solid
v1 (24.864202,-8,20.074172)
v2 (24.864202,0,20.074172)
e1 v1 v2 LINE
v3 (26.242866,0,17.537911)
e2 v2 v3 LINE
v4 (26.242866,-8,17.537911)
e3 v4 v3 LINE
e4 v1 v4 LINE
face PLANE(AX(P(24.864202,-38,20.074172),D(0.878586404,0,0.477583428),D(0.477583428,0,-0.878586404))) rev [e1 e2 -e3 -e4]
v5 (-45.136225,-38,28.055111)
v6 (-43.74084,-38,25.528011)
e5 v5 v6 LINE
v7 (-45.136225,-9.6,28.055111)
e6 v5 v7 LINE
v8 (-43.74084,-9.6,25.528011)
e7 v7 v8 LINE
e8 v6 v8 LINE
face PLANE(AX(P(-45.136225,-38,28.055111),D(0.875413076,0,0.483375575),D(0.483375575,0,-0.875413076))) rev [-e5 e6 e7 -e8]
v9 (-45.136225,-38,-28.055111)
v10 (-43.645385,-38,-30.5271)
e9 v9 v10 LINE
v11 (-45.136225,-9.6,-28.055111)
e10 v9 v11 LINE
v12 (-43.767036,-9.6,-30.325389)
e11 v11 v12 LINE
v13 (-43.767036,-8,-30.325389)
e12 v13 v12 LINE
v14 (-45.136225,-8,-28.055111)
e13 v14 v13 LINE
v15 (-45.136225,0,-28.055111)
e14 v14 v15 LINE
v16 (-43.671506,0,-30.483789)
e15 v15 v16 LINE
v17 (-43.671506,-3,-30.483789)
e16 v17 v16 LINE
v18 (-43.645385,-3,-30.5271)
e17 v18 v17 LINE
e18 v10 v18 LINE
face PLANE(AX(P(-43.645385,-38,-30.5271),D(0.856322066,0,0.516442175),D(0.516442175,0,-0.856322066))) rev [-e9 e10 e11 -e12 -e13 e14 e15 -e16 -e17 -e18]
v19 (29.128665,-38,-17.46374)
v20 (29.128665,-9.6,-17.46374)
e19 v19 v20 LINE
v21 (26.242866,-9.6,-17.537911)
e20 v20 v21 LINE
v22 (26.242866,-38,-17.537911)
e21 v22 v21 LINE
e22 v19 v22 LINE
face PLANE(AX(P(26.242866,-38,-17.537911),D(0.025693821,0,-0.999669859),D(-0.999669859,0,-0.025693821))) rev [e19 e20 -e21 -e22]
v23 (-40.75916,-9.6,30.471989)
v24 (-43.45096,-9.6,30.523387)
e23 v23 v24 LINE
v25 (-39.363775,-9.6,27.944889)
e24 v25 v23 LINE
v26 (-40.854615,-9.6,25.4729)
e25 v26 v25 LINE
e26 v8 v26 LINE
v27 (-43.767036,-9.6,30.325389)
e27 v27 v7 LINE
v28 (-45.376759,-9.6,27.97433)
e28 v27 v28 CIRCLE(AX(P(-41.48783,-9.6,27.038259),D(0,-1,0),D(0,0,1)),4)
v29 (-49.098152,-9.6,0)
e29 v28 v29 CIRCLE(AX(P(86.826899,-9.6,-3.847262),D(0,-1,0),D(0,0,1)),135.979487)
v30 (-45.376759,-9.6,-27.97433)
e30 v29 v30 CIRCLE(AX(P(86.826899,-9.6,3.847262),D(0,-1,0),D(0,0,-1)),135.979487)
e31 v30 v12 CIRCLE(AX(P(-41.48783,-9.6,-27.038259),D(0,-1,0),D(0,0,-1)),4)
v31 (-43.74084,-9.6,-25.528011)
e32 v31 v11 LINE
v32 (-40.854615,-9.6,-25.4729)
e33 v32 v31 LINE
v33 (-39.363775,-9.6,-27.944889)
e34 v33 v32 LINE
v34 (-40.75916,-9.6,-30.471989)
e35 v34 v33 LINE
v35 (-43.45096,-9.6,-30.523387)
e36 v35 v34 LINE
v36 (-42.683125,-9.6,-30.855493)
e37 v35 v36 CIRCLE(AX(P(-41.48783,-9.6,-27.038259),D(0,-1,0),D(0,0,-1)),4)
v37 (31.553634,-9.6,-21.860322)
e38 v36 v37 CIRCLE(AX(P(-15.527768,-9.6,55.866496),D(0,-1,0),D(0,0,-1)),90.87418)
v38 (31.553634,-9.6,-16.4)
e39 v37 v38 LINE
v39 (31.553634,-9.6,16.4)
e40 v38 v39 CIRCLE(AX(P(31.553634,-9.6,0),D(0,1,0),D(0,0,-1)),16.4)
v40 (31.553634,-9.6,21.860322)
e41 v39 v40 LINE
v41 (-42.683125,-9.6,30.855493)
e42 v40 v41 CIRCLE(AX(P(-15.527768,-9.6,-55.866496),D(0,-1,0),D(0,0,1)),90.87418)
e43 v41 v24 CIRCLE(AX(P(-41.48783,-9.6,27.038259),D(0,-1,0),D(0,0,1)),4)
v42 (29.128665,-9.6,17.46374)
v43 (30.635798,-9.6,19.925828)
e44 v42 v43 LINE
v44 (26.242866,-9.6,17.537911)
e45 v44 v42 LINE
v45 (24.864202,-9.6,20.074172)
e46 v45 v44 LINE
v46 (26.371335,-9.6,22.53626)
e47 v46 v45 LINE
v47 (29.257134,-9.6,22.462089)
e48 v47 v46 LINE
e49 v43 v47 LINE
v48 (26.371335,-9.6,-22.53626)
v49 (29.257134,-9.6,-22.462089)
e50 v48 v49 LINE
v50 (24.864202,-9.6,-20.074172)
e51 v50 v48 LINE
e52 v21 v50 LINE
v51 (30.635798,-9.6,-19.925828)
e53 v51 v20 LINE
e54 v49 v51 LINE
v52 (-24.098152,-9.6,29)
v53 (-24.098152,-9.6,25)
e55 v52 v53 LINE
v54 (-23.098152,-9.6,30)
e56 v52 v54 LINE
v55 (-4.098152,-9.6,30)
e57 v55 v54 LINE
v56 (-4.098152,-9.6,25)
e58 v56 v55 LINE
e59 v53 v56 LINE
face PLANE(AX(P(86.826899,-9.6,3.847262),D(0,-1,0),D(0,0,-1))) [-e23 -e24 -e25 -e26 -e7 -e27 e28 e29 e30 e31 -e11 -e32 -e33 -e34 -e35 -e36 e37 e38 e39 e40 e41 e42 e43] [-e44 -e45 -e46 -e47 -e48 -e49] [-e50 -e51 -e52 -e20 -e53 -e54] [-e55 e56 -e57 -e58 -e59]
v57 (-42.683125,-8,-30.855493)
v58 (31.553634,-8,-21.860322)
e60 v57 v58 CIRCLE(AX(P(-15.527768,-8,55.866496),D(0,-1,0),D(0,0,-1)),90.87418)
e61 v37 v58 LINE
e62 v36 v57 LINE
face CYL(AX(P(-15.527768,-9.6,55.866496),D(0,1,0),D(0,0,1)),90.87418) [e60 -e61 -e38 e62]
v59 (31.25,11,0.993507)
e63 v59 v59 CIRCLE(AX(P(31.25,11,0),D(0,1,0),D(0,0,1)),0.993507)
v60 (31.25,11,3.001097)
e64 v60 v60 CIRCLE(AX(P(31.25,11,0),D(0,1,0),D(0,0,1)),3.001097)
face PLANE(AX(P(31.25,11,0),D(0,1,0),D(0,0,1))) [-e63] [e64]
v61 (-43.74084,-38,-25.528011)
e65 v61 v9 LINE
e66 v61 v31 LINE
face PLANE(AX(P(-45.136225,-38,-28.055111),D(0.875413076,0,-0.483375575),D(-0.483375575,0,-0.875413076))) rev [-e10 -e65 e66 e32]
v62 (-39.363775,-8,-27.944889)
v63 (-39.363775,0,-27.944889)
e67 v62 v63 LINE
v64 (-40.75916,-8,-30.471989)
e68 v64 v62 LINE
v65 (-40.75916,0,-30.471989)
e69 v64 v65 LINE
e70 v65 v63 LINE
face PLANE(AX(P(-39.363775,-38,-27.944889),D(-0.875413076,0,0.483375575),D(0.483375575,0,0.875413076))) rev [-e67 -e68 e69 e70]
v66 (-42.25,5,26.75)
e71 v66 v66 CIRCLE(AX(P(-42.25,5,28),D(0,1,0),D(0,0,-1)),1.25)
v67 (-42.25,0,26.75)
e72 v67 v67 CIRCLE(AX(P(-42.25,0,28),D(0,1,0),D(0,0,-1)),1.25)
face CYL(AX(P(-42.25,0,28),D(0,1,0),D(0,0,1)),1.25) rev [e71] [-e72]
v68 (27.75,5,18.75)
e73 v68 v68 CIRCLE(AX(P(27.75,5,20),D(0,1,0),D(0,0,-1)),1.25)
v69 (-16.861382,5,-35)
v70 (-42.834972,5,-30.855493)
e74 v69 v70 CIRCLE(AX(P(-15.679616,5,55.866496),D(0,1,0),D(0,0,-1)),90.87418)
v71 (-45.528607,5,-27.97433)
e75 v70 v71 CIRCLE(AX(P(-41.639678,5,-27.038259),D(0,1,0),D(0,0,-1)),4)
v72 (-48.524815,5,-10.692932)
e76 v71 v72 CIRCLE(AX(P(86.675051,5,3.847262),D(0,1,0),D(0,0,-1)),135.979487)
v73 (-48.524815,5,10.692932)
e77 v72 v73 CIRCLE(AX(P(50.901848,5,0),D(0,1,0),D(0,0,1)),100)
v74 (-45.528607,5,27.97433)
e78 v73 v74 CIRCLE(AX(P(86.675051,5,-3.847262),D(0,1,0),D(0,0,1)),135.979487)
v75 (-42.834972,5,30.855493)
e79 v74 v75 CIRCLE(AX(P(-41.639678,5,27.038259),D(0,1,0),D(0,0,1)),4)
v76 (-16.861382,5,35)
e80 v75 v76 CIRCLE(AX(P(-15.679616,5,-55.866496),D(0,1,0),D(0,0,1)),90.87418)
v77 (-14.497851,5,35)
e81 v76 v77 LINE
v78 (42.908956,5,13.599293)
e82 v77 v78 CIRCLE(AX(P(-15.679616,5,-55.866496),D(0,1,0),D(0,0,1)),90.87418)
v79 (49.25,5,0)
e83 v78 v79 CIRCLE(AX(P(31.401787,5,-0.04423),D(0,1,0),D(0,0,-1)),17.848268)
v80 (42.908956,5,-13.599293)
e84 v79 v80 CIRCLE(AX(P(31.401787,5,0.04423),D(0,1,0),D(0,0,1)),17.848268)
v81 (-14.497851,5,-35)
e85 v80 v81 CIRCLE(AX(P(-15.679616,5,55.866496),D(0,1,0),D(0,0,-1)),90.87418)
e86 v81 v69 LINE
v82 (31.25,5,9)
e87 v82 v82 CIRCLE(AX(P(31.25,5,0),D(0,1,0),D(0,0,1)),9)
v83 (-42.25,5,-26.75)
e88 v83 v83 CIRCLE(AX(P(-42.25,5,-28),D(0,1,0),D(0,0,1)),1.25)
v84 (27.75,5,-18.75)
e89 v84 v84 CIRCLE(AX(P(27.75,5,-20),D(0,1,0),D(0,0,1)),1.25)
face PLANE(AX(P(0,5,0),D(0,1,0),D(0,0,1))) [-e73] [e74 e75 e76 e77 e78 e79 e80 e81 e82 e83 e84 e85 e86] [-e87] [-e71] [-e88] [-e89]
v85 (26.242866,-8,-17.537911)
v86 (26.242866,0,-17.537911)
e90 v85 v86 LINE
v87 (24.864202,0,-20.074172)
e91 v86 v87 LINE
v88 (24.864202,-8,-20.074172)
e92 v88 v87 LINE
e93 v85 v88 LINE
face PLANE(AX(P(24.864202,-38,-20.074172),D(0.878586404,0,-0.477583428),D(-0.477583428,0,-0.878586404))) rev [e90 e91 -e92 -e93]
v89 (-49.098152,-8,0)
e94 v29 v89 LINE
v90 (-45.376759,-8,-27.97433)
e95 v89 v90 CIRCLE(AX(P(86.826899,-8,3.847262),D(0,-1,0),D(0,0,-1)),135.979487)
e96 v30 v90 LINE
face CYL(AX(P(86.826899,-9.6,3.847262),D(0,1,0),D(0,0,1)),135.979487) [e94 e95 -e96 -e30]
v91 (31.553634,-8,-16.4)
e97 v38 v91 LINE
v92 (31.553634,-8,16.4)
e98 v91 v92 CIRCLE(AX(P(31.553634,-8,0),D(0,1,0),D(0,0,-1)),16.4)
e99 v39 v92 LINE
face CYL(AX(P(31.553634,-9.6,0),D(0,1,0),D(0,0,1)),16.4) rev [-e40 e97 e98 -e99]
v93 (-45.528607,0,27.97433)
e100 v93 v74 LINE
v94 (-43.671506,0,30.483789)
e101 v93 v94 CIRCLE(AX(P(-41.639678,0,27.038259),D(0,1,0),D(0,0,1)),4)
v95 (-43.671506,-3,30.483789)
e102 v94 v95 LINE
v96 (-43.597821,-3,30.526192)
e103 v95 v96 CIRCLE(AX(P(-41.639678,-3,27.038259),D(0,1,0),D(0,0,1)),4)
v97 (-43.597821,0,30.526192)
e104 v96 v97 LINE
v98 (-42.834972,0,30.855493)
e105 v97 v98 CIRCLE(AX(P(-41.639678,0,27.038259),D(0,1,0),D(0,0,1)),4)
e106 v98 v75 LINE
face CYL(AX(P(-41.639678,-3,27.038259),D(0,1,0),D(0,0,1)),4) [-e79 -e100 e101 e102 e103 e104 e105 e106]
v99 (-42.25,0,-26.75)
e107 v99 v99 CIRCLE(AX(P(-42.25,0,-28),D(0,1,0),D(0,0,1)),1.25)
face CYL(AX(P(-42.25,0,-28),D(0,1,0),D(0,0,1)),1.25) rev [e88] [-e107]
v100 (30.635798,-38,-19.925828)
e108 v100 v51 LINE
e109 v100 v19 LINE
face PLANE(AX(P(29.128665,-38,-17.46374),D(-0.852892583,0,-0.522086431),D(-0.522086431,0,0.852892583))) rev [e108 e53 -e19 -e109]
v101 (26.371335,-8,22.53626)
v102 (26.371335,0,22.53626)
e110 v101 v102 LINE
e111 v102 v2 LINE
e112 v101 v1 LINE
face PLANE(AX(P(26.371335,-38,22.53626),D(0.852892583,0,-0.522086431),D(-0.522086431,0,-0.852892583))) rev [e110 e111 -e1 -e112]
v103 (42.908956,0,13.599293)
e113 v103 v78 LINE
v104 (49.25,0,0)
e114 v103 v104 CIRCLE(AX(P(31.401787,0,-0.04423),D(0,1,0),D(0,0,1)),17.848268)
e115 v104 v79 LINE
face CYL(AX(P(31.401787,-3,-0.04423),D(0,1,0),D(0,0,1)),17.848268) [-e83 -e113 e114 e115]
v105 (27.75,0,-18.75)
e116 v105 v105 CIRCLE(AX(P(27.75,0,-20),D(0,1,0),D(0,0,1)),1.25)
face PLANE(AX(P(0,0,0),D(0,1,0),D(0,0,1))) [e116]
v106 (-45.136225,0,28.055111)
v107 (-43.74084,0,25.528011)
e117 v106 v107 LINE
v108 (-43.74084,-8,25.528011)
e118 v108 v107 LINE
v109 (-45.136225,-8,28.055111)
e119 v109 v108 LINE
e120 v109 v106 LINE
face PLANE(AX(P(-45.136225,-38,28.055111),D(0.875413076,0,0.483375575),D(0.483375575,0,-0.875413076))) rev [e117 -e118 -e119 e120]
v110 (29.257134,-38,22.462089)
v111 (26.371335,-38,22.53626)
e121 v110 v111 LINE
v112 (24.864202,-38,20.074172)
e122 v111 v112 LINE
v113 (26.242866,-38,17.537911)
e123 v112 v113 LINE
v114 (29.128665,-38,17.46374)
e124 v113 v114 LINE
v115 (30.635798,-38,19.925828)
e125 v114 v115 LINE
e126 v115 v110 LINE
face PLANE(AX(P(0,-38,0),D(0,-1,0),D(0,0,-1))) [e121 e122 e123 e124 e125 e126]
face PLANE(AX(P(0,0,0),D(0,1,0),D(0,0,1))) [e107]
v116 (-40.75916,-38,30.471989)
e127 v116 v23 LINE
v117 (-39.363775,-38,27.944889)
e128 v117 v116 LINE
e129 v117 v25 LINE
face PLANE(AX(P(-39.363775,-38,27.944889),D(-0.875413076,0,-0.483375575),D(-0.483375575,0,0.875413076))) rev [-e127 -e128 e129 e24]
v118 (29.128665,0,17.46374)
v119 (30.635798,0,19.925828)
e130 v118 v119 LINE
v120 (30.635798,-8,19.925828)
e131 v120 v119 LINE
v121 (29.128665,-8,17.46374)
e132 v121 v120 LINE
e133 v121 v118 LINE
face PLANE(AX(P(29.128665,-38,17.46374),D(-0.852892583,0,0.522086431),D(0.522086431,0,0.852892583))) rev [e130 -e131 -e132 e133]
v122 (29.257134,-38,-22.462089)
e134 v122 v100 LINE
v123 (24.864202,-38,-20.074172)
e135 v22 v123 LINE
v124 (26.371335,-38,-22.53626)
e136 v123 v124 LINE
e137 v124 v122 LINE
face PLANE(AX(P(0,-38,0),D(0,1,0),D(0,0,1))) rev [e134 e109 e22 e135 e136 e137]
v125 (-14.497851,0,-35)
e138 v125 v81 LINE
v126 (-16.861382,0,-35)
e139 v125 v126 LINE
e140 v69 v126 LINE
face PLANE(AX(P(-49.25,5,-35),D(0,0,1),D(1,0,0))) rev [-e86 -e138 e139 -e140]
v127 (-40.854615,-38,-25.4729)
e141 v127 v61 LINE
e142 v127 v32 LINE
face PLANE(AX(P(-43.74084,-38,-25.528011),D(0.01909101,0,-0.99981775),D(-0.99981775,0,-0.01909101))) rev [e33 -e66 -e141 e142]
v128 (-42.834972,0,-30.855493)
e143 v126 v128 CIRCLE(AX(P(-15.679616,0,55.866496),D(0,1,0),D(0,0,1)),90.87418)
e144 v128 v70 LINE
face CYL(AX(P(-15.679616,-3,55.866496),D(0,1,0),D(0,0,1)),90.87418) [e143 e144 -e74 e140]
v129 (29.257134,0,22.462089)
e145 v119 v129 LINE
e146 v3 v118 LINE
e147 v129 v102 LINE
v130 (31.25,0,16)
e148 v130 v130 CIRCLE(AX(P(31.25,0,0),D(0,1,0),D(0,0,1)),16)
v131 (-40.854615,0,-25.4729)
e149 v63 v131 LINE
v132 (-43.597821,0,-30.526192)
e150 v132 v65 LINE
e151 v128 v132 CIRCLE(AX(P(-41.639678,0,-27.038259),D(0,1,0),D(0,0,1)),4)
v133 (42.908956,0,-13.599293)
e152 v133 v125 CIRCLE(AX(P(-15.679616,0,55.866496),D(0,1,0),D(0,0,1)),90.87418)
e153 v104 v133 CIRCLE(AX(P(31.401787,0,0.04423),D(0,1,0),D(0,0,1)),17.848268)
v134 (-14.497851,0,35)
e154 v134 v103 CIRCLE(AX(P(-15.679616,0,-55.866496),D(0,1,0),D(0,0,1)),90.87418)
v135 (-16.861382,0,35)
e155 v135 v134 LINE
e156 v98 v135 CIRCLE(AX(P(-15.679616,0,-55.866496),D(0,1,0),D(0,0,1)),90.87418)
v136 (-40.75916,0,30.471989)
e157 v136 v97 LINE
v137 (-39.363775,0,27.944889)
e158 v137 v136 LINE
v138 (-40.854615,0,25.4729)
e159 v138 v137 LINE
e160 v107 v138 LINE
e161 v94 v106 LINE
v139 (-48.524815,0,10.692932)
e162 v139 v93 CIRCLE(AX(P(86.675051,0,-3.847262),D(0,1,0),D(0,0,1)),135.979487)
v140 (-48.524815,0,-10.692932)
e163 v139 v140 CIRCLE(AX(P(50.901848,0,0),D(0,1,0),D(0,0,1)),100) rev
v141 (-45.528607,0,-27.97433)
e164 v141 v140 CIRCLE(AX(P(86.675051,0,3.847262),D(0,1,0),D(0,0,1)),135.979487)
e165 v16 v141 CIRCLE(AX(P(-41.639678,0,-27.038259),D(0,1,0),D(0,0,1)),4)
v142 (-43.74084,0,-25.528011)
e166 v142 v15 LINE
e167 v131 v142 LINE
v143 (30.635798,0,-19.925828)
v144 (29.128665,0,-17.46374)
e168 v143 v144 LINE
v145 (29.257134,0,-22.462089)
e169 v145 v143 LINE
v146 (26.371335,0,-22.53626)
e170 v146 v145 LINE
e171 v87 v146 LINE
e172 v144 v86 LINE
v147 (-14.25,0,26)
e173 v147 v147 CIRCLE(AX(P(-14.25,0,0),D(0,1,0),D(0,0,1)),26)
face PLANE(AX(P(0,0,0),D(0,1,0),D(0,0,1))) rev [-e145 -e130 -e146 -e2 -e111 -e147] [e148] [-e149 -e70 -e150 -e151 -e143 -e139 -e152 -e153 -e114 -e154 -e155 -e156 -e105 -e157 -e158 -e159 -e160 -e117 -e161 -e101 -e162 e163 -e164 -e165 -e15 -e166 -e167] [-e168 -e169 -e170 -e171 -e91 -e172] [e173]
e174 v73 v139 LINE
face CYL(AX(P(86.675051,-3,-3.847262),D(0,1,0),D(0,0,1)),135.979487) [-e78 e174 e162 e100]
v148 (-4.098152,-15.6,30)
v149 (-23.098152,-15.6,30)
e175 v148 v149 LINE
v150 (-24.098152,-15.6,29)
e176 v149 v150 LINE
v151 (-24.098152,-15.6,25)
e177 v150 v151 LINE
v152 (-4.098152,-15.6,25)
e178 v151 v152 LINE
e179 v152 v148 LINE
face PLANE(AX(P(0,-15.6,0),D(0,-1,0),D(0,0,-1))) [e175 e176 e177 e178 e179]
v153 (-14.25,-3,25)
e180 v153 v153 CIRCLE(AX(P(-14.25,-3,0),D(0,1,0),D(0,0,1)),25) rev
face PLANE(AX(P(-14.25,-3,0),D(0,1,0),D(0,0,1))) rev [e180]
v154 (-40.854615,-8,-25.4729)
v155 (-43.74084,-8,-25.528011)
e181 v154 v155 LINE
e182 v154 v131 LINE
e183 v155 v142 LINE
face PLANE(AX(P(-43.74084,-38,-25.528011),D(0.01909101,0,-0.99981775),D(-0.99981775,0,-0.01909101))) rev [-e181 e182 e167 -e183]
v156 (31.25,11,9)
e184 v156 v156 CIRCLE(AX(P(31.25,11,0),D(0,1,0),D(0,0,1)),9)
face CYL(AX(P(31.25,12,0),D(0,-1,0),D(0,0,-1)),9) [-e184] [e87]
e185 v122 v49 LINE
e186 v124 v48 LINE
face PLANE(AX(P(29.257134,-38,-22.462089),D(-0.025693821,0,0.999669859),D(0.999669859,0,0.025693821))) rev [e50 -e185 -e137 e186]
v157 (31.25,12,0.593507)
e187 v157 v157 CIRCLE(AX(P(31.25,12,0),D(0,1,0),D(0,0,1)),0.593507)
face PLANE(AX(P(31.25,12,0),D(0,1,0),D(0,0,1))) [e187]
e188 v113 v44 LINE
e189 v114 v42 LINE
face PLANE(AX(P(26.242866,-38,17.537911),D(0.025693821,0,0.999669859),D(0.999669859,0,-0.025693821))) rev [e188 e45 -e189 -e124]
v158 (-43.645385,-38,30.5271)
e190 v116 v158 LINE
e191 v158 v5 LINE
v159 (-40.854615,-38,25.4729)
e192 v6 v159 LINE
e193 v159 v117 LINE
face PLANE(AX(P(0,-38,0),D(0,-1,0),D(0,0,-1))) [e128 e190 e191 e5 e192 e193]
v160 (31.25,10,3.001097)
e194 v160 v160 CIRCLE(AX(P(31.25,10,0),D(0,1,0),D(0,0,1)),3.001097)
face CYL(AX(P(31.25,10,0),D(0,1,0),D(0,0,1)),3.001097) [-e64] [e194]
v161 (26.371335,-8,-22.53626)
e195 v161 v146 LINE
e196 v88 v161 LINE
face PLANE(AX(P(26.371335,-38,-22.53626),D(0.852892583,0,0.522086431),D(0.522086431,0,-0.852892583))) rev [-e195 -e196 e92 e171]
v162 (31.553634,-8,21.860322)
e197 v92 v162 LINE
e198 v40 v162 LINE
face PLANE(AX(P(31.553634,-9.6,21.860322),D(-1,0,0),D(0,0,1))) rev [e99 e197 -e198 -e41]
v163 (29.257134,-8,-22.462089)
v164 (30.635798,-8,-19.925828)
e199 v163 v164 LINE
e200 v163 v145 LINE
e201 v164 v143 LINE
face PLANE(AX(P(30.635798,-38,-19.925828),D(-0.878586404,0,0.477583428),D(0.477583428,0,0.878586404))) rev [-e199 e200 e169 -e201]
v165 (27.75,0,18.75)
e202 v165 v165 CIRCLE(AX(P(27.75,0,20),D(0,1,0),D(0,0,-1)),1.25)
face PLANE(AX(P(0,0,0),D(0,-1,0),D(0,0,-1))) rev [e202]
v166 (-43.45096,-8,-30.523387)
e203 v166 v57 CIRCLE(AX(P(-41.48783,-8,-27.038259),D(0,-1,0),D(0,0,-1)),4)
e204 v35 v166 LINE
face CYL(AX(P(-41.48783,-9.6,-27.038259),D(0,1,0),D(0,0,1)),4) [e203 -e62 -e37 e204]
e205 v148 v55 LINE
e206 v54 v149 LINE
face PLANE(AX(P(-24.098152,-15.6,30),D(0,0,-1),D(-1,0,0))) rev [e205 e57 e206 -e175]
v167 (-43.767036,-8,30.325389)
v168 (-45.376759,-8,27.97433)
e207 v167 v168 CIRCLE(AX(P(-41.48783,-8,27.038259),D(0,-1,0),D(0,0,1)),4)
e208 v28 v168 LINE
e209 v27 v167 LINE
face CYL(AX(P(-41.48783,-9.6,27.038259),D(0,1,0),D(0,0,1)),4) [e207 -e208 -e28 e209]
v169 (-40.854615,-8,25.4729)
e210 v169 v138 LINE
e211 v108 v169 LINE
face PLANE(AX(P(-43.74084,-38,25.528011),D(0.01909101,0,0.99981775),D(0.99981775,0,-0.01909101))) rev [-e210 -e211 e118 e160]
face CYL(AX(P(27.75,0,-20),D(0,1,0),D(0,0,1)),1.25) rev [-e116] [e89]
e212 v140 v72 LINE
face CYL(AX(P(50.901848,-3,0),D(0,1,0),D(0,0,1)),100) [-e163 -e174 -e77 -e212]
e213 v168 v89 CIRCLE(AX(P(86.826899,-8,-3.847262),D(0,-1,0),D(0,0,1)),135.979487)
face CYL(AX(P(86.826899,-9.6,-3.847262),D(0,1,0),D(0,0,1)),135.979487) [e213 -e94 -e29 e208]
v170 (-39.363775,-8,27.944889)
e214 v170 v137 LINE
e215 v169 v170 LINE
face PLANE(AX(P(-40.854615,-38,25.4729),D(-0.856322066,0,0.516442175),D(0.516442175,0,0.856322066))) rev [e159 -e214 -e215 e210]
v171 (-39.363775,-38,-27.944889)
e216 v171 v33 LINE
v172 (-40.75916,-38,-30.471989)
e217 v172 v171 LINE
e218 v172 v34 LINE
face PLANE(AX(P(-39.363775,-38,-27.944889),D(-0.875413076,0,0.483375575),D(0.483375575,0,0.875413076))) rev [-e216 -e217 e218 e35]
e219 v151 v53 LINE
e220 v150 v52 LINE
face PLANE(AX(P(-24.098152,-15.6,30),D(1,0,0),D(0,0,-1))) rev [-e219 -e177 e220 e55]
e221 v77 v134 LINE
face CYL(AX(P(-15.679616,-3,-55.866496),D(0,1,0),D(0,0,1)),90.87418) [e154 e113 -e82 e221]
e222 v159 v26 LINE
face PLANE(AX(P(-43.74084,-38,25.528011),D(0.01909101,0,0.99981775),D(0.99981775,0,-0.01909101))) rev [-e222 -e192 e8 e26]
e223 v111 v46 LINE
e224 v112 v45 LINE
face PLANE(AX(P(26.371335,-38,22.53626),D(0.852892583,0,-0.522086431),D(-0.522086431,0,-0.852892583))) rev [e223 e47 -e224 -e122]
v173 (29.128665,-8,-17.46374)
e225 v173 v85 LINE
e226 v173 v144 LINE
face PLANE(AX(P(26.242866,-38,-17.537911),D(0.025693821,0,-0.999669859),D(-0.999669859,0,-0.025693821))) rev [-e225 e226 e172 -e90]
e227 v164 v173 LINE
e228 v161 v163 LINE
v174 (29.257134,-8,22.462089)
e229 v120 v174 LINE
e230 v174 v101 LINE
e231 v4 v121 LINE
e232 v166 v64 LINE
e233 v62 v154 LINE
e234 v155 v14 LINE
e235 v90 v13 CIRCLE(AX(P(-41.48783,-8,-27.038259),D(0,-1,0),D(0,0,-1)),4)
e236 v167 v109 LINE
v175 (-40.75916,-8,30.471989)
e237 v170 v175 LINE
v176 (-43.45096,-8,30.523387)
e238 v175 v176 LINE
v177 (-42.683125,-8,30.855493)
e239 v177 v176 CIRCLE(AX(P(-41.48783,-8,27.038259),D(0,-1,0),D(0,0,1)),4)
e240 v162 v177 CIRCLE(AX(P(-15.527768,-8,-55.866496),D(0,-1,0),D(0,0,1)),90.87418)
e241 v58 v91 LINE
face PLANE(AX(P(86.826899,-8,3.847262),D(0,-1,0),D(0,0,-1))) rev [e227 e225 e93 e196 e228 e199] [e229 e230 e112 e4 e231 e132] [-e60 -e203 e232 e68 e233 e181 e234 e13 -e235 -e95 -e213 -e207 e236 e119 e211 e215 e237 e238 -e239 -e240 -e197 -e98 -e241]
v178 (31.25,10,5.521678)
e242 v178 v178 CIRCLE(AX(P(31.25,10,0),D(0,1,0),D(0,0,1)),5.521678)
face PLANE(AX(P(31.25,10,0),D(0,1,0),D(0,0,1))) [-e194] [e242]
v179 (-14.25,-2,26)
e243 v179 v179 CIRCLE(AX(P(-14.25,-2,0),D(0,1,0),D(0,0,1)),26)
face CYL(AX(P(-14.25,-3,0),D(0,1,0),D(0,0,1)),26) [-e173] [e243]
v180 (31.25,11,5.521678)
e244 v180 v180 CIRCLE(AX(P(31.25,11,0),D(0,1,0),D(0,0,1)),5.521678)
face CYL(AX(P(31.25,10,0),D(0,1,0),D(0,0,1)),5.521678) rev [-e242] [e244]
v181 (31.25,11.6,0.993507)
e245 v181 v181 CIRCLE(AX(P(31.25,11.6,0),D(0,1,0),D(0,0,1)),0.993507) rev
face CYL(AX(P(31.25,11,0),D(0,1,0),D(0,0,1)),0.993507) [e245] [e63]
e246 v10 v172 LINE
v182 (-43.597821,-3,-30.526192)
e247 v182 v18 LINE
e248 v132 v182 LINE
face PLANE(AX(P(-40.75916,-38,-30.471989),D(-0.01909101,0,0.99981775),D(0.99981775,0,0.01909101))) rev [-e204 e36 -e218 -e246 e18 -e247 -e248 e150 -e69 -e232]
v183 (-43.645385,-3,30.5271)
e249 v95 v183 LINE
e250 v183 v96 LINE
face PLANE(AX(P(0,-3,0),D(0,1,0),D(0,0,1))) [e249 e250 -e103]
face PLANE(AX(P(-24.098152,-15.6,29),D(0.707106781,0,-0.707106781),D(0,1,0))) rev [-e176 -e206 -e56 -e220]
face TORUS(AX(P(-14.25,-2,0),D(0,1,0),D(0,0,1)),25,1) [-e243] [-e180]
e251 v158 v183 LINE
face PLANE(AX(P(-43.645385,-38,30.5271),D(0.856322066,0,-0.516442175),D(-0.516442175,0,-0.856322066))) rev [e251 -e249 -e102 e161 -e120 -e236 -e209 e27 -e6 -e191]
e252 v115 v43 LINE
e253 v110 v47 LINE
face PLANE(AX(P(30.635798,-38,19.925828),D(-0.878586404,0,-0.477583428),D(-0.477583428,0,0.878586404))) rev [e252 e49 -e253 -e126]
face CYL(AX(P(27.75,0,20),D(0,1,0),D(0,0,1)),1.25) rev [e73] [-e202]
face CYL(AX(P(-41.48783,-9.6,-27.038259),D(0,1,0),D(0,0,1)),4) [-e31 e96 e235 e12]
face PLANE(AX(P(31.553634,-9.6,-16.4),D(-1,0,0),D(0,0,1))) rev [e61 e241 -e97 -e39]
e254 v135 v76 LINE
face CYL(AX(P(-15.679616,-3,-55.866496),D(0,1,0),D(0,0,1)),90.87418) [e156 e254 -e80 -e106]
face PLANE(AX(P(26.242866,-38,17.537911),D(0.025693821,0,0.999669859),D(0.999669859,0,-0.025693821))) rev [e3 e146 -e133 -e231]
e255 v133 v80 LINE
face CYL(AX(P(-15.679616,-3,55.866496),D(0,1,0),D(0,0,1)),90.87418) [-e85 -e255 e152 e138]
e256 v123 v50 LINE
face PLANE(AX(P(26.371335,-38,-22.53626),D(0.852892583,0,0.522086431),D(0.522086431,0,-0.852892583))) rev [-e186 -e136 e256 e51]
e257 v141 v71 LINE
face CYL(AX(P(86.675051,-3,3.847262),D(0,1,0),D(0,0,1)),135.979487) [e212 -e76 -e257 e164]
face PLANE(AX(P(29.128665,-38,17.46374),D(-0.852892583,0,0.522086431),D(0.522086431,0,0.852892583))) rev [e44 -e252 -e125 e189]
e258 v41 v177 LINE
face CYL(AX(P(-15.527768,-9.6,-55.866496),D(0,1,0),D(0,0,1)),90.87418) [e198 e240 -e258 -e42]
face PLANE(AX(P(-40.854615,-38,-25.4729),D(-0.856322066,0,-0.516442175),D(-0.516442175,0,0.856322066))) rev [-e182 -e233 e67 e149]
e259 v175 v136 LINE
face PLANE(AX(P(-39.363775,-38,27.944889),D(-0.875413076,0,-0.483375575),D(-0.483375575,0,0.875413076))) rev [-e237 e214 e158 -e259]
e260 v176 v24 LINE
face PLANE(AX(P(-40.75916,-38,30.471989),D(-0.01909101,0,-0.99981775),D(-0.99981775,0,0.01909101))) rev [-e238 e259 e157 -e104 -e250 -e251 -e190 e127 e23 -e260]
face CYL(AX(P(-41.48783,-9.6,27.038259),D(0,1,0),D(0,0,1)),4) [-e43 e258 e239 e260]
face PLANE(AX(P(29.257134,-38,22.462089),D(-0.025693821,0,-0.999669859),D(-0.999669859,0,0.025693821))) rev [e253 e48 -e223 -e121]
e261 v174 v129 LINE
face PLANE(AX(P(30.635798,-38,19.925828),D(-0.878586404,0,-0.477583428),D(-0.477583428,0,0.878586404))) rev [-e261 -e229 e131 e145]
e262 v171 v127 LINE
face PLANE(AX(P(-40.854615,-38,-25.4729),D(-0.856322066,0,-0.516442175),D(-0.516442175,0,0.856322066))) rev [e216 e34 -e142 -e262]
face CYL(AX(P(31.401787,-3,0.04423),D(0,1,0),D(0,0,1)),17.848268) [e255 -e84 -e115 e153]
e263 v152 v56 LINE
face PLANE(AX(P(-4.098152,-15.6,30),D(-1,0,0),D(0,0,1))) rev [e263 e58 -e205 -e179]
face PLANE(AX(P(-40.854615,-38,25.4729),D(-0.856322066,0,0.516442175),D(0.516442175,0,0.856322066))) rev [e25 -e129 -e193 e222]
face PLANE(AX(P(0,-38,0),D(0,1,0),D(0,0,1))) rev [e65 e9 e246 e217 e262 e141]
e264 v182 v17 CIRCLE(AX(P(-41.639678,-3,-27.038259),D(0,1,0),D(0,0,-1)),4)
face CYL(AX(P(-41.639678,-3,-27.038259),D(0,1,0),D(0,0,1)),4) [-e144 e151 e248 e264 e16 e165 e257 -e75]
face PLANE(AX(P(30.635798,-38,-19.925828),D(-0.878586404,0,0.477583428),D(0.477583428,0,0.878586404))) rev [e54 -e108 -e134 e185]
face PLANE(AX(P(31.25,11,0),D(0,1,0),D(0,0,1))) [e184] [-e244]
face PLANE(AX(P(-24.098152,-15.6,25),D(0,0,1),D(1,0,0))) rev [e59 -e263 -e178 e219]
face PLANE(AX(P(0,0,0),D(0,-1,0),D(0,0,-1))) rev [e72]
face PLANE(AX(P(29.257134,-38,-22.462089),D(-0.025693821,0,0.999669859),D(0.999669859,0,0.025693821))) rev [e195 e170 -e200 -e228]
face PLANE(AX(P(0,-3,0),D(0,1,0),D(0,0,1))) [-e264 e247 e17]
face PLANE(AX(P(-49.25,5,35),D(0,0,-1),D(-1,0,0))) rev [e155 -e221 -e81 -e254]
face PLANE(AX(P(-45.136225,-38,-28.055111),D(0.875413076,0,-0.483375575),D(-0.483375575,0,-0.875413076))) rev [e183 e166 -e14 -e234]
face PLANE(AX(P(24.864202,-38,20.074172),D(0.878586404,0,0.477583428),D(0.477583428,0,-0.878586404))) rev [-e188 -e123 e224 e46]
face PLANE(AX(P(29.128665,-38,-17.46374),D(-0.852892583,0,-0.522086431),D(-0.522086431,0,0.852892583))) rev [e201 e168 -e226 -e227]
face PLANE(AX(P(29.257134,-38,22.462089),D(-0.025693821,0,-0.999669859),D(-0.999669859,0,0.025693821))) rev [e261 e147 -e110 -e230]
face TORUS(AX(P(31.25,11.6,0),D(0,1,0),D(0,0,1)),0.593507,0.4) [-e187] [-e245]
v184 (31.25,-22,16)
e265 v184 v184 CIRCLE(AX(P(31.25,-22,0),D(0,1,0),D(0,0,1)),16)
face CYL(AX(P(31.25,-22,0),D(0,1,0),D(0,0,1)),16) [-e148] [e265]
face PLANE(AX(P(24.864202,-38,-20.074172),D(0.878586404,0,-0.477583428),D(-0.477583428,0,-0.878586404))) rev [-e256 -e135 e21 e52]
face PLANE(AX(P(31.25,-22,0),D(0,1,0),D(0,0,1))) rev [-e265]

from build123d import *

# Parameters (mm, degrees)
SKETCH_1_W          = 98.5
SKETCH_1_H          = 70
EXTRUDE_1_DEPTH     = 5
SKETCH_2_R          = 35
EXTRUDE_2_DEPTH     = 28.1
SKETCH_3_R          = 2
CUT_EXTRUDE_1_DEPTH = 5
FILLET_1_R          = 2
FILLET_2_R          = 1
SKETCH_4_R          = 13
SKETCH_4_W          = 3.316540618
SKETCH_4_H          = 5.120069114
SKETCH_4_W_2        = 3.276095001
SKETCH_4_W_3        = 1.001370982
SKETCH_4_H_2        = 2.121481923
SKETCH_4_H_3        = 2.893302243
SKETCH_4_W_4        = 1.096399653
SKETCH_4_H_4        = 2.99297568
SKETCH_4_W_5        = 1.536933457
SKETCH_4_H_5        = 3.356986235
SKETCH_4_W_6        = 1.658270309
SKETCH_4_W_7        = 1.334705371
SKETCH_4_H_6        = 1.05158605
SKETCH_4_W_8        = 1.294259754
SKETCH_4_H_7        = 1.092031667
CUT_EXTRUDE_3_DEPTH = 0.5
SKETCH_5_R          = 1.25
CUT_EXTRUDE_4_DEPTH = 5
SKETCH_6_R          = 9
EXTRUDE_3_DEPTH     = 7
CUT_EXTRUDE_START   = -1
SKETCH_7_R          = 9
SKETCH_7_R_2        = 0.99350654
CUT_EXTRUDE_5_DEPTH = 1
SKETCH_8_R          = 5.521677929
SKETCH_8_R_2        = 3.001097475
CUT_EXTRUDE_6_DEPTH = 1
FILLET_3_R          = 0.4
SKETCH_9_R          = 16
EXTRUDE_4_DEPTH     = 27
EXTRUDE_5_DEPTH     = 38
SKETCH_11_R         = 26
EXTRUDE_6_DEPTH     = 8
FILLET_4_R          = 1
SKETCH_12_W         = 106.251501727
SKETCH_12_H         = 75.565901032
CUT_EXTRUDE_7_DEPTH = 8
FILLET_5_R          = 100
EXTRUDE_START       = 8
EXTRUDE_7_DEPTH     = 1.6
SKETCH_14_W         = 20
SKETCH_14_H         = 5
EXTRUDE_8_DEPTH     = 6
CHAMFER_1_SIZE      = 1
CUT_EXTRUDE1_START  = -28.1
SKETCH1_R           = 35
CUT_EXTRUDE1_DEPTH  = 28.1


with BuildPart() as part:
    # Эскиз1 → Бобышка-Вытянуть1 (new body)
    with BuildSketch(Plane(origin=(0, 0, 0), x_dir=(1, 0, 0), z_dir=(0, 1, 0))):
        Rectangle(SKETCH_1_W, SKETCH_1_H)
    extrude(amount=EXTRUDE_1_DEPTH)

    # Эскиз2 → Бобышка-Вытянуть2 (add)
    with BuildSketch(Plane(origin=(0, 5, 0), x_dir=(1, 0, 0), z_dir=(0, 1, 0))):
        with Locations(Location((-14.25, 0, 0), (0, 0, 270))):
            Circle(SKETCH_2_R)
    extrude(amount=EXTRUDE_2_DEPTH)

    # Эскиз3 → Вырез-Вытянуть1 (cut)
    with BuildSketch(Plane(origin=(0, 33.1, 0), x_dir=(1, 0, 0), z_dir=(0, 1, 0))):
        with Locations(Location((-14.25, 28.5, 0), (0, 0, 270))):
            Circle(SKETCH_3_R)
        with Locations(Location((-34.553940504, -20, 0), (0, 0, 270))):
            Circle(SKETCH_3_R)
        with Locations(Location((6.053940504, -20, 0), (0, 0, 270))):
            Circle(SKETCH_3_R)
    extrude(amount=-CUT_EXTRUDE_1_DEPTH, mode=Mode.SUBTRACT)

    # Скругление1
    fillet_1_edges = [part.edges().sort_by_distance(p)[0] for p in [
        (-14.25, 33.1, -35),
    ]]
    fillet(fillet_1_edges, radius=FILLET_1_R)

    # Скругление2
    fillet_2_edges = [part.edges().sort_by_distance(p)[0] for p in [
        (-14.25, 33.1, -30.5),
        (-34.553940504, 33.1, 18),
        (6.053940504, 33.1, 18),
    ]]
    fillet(fillet_2_edges, radius=FILLET_2_R)

    # Эскиз4 → Вырез-Вытянуть3 (cut)
    # profile 1 of 7: a face of its own
    with BuildSketch(Plane(origin=(0, 33.1, 0), x_dir=(1, 0, 0), z_dir=(0, 1, 0))):
        with Locations(Location((-14.25, 0, 0), (0, 0, 270))):
            Circle(SKETCH_4_R)
        Polygon((-22.115166942, -6.914876839), (-22.115166942, -0.831627154), (-19.0735421, -0.831627154), (-19.0735421, -5.853844917), (-21.266341405, -5.853844917), (-21.266341405, -6.914876839), align=None, mode=Mode.SUBTRACT)
        Polygon((-22.115166942, 0), (-22.115166942, 5.120069114), (-19.0735421, 5.120069114), (-19.0735421, 4.27071115), (-21.266341405, 4.27071115), (-21.266341405, 0), align=None, mode=Mode.SUBTRACT)
        Polygon((-13.829606569, 0), (-13.829606569, 6.292992015), (-12.980248606, 6.292992015), (-12.980248606, 5.120069114), (-10.715294037, 5.120069114), (-10.715294037, 0), align=None, mode=Mode.SUBTRACT)
        with Locations((-16.458571693, 2.560034557)):
            Rectangle(SKETCH_4_W, SKETCH_4_H, mode=Mode.SUBTRACT)
        with Locations((-8.187442955, 2.560034557)):
            Rectangle(SKETCH_4_W_2, SKETCH_4_H, mode=Mode.SUBTRACT)
        with Locations((-7.050080946, -1.825090787)):
            Rectangle(SKETCH_4_W_3, SKETCH_4_H_2, mode=Mode.SUBTRACT)
        with Locations((-7.050080946, -5.468225718)):
            Rectangle(SKETCH_4_W_3, SKETCH_4_H_3, mode=Mode.SUBTRACT)
        Polygon((-9.825490456, -0.831627154), (-8.643651064, -0.831627154), (-8.643651064, -2.960833634), (-7.550766437, -2.960833634), (-7.550766437, -3.957287265), (-8.643651064, -3.957287265), (-8.643651064, -5.853844917), (-9.825490456, -5.853844917), align=None, mode=Mode.SUBTRACT)
        Polygon((-13.829606569, -0.831627154), (-10.715294037, -0.831627154), (-10.715294037, -5.853844917), (-13.829606569, -5.853844917), (-13.829606569, -3.04994558), (-11.645543235, -3.04994558), (-11.645543235, -1.940786367), (-13.829606569, -1.940786367), align=None, mode=Mode.SUBTRACT)
        Polygon((-18.116842002, -0.831627154), (-14.800301384, -0.831627154), (-14.800301384, -4.141977247), (-16.943919101, -4.141977247), (-16.943919101, -4.950889593), (-14.800301384, -4.950889593), (-14.800301384, -5.853844917), (-18.116842002, -5.853844917), align=None, mode=Mode.SUBTRACT)
    # profile 2 of 7: a face of its own
    with BuildSketch(Plane(origin=(0, 33.1, 0), x_dir=(1, 0, 0), z_dir=(0, 1, 0))):
        with Locations((-20.718141579, -3.454401753)):
            Rectangle(SKETCH_4_W_4, SKETCH_4_H_4)
    # profile 3 of 7: a face of its own
    with BuildSketch(Plane(origin=(0, 33.1, 0), x_dir=(1, 0, 0), z_dir=(0, 1, 0))):
        with Locations((-8.167220148, 2.592218033)):
            Rectangle(SKETCH_4_W_5, SKETCH_4_H_5)
    # profile 4 of 7: a face of its own
    with BuildSketch(Plane(origin=(0, 33.1, 0), x_dir=(1, 0, 0), z_dir=(0, 1, 0))):
        with Locations((-16.478794502, 2.592218033)):
            Rectangle(SKETCH_4_W_6, SKETCH_4_H_5)
    # profile 5 of 7: a face of its own
    with BuildSketch(Plane(origin=(0, 33.1, 0), x_dir=(1, 0, 0), z_dir=(0, 1, 0))):
        with Locations((-12.312895921, 2.592218033)):
            Rectangle(SKETCH_4_W_7, SKETCH_4_H_5)
    # profile 6 of 7: a face of its own
    with BuildSketch(Plane(origin=(0, 33.1, 0), x_dir=(1, 0, 0), z_dir=(0, 1, 0))):
        with Locations((-12.312895921, -4.667770272)):
            Rectangle(SKETCH_4_W_7, SKETCH_4_H_6)
    # profile 7 of 7: a face of its own
    with BuildSketch(Plane(origin=(0, 33.1, 0), x_dir=(1, 0, 0), z_dir=(0, 1, 0))):
        with Locations((-16.296789224, -2.503929746)):
            Rectangle(SKETCH_4_W_8, SKETCH_4_H_7)
    extrude(amount=-CUT_EXTRUDE_3_DEPTH, mode=Mode.SUBTRACT)

    # Эскиз5 → Вырез-Вытянуть4 (cut)
    with BuildSketch(Plane(origin=(0, 5, 0), x_dir=(1, 0, 0), z_dir=(0, 1, 0))):
        with Locations(Location((-42.25, 28, 0), (0, 0, 270))):
            Circle(SKETCH_5_R)
        with Locations(Location((27.75, 20, 0), (0, 0, 270))):
            Circle(SKETCH_5_R)
        with Locations(Location((27.75, -20, 0), (0, 0, 90))):
            Circle(SKETCH_5_R)
        with Locations(Location((-42.25, -28, 0), (0, 0, 90))):
            Circle(SKETCH_5_R)
    extrude(amount=-CUT_EXTRUDE_4_DEPTH, mode=Mode.SUBTRACT)

    # Эскиз6 → Бобышка-Вытянуть3 (add)
    with BuildSketch(Plane(origin=(0, 5, 0), x_dir=(1, 0, 0), z_dir=(0, 1, 0))):
        with Locations(Location((31.25, 0, 0), (0, 0, 270))):
            Circle(SKETCH_6_R)
    extrude(amount=EXTRUDE_3_DEPTH)

    # Эскиз7 → Вырез-Вытянуть5 (cut)
    with BuildSketch(Plane(origin=(0, 12, 0), x_dir=(1, 0, 0), z_dir=(0, 1, 0)).offset(CUT_EXTRUDE_START)):
        with Locations(Location((31.25, 0, 0), (0, 0, 270))):
            Circle(SKETCH_7_R)
        with Locations(Location((31.25, 0, 0), (0, 0, 270))):
            Circle(SKETCH_7_R_2, mode=Mode.SUBTRACT)
    extrude(amount=CUT_EXTRUDE_5_DEPTH, mode=Mode.SUBTRACT)

    # Эскиз8 → Вырез-Вытянуть6 (cut)
    with BuildSketch(Plane(origin=(0, 11, 0), x_dir=(1, 0, 0), z_dir=(0, 1, 0))):
        with Locations(Location((31.25, 0, 0), (0, 0, 270))):
            Circle(SKETCH_8_R)
        with Locations(Location((31.25, 0, 0), (0, 0, 270))):
            Circle(SKETCH_8_R_2, mode=Mode.SUBTRACT)
    extrude(amount=-CUT_EXTRUDE_6_DEPTH, mode=Mode.SUBTRACT)

    # Скругление3
    fillet_3_edges = [part.edges().sort_by_distance(p)[0] for p in [
        (31.25, 12, -0.99350654),
    ]]
    fillet(fillet_3_edges, radius=FILLET_3_R)

    # Эскиз9 → Бобышка-Вытянуть4 (add)
    with BuildSketch(Plane(origin=(0, 5, 0), x_dir=(1, 0, 0), z_dir=(0, 1, 0))):
        with Locations(Location((31.25, 0, 0), (0, 0, 270))):
            Circle(SKETCH_9_R)
    extrude(amount=-EXTRUDE_4_DEPTH)

    # Эскиз10 → Бобышка-Вытянуть5 (add)
    with BuildSketch(Plane.XZ):
        Polygon((-40.854614908, 25.472900125), (-39.363774764, 27.944889), (-40.759159856, 30.471988875), (-43.645385092, 30.527099875), (-45.136225236, 28.055111), (-43.740840144, 25.528011125), align=None)
        Polygon((29.257133708, 22.462088812), (26.371335397, 22.536260484), (24.864201688, 20.074171672), (26.242866292, 17.537911188), (29.128664603, 17.463739516), (30.635798312, 19.925828328), align=None)
        Polygon((30.635798312, -19.925828328), (29.257133708, -22.462088812), (26.371335397, -22.536260484), (24.864201688, -20.074171672), (26.242866292, -17.537911188), (29.128664603, -17.463739516), align=None)
        Polygon((-43.740840144, -25.528011125), (-40.854614908, -25.472900125), (-39.363774764, -27.944889), (-40.759159856, -30.471988875), (-43.645385092, -30.527099875), (-45.136225236, -28.055111), align=None)
    extrude(amount=EXTRUDE_5_DEPTH)

    # Эскиз11 → Бобышка-Вытянуть6 (add)
    with BuildSketch(Plane(origin=(0, 5, 0), x_dir=(1, 0, 0), z_dir=(0, 1, 0))):
        with Locations(Location((-14.25, 0, 0), (0, 0, 270))):
            Circle(SKETCH_11_R)
    extrude(amount=-EXTRUDE_6_DEPTH)

    # Скругление4
    fillet_4_edges = [part.edges().sort_by_distance(p)[0] for p in [
        (-14.25, -3, -26),
    ]]
    fillet(fillet_4_edges, radius=FILLET_4_R)

    # Эскиз12 → Вырез-Вытянуть7 (cut)
    with BuildSketch(Plane(origin=(0, 5, 0), x_dir=(1, 0, 0), z_dir=(0, 1, 0))):
        with Locations((-0.925367694, -0.052186396)):
            Rectangle(SKETCH_12_W, SKETCH_12_H)
        with BuildLine():
            ThreePointArc((-49.25, 0), (-48.116981176, 14.083966884), (-45.528607092, 27.974329531))
            ThreePointArc((-45.528607092, 27.974329531), (-44.561596332, 29.769996926), (-42.834972324, 30.855492545))
            ThreePointArc((-42.834972324, 30.855492545), (2.249574036, 33.221442581), (42.908955543, 13.599293477))
            ThreePointArc((42.908955543, 13.599293477), (47.577997957, 7.498372972), (49.25, 0))
            ThreePointArc((49.25, 0), (47.577997957, -7.498372972), (42.908955543, -13.599293477))
            ThreePointArc((42.908955543, -13.599293477), (2.249574036, -33.221442581), (-42.834972324, -30.855492545))
            ThreePointArc((-42.834972324, -30.855492545), (-44.561596332, -29.769996926), (-45.528607092, -27.974329531))
            ThreePointArc((-45.528607092, -27.974329531), (-48.116981176, -14.083966884), (-49.25, 0))
        make_face(mode=Mode.SUBTRACT)
    extrude(amount=-CUT_EXTRUDE_7_DEPTH, mode=Mode.SUBTRACT)

    # Скругление5
    # the kernel refuses this fillet: 100 mm, written as the material it takes off along each edge
    with BuildSketch(Plane(origin=(-49.25, 5, 0), x_dir=(0.06766370453174418, 0, 0.9977081853372963), z_dir=(0, -1, 0))) as fillet_5_piece_1:
        with BuildLine():
            CenterArc((6.776645039, -99.922318338), FILLET_5_R, 87.741474483, 12.276669201)
            ThreePointArc((-10.619357471, -1.44704684), (-5.323940761, -0.618859533), (0, 0))
            ThreePointArc((0, 0), (5.358747467, 0.105631125), (10.717494933, 0))
        make_face()
    extrude(amount=31.793737334, mode=Mode.SUBTRACT)

    # Эскиз13 → Бобышка-Вытянуть7 (add)
    with BuildSketch(Plane.XZ.offset(EXTRUDE_START)):
        with BuildLine():
            Line((31.553634402, 21.860321538), (31.553634402, 16.4))
            ThreePointArc((31.553634402, 16.4), (15.153634402, 0), (31.553634402, -16.4))
            Line((31.553634402, -16.4), (31.553634402, -21.860321538))
            ThreePointArc((31.553634402, -21.860321538), (-4.596615235, -34.347840749), (-42.683124513, -30.855492545))
            ThreePointArc((-42.683124513, -30.855492545), (-44.409748521, -29.769996926), (-45.37675928, -27.974329531))
            ThreePointArc((-45.37675928, -27.974329531), (-47.965133365, -14.083966884), (-49.098152188, 0))
            ThreePointArc((-49.098152188, 0), (-47.965133365, 14.083966884), (-45.37675928, 27.974329531))
            ThreePointArc((-45.37675928, 27.974329531), (-44.409748521, 29.769996926), (-42.683124513, 30.855492545))
            ThreePointArc((-42.683124513, 30.855492545), (-4.596615235, 34.347840749), (31.553634402, 21.860321538))
        make_face()
    extrude(amount=EXTRUDE_7_DEPTH)

    # Эскиз14 → Бобышка-Вытянуть8 (add)
    with BuildSketch(Plane.XZ.offset(9.6)):
        with Locations((-14.098152188, 27.5)):
            Rectangle(SKETCH_14_W, SKETCH_14_H)
    extrude(amount=EXTRUDE_8_DEPTH)

    # Фаска1
    chamfer_1_edges = [part.edges().sort_by_distance(p)[0] for p in [
        (-24.098152188, -12.6, 30),
    ]]
    chamfer(chamfer_1_edges, length=CHAMFER_1_SIZE)

    # Sketch1 → Cut-Extrude1 (cut)
    with BuildSketch(Plane(origin=(0, 33.1, 0), x_dir=(1, 0, 0), z_dir=(0, 1, 0)).offset(CUT_EXTRUDE1_START)):
        with Locations((-14.25, 0)):
            Circle(SKETCH1_R)
    extrude(amount=CUT_EXTRUDE1_DEPTH, mode=Mode.SUBTRACT)


solid = part.part
